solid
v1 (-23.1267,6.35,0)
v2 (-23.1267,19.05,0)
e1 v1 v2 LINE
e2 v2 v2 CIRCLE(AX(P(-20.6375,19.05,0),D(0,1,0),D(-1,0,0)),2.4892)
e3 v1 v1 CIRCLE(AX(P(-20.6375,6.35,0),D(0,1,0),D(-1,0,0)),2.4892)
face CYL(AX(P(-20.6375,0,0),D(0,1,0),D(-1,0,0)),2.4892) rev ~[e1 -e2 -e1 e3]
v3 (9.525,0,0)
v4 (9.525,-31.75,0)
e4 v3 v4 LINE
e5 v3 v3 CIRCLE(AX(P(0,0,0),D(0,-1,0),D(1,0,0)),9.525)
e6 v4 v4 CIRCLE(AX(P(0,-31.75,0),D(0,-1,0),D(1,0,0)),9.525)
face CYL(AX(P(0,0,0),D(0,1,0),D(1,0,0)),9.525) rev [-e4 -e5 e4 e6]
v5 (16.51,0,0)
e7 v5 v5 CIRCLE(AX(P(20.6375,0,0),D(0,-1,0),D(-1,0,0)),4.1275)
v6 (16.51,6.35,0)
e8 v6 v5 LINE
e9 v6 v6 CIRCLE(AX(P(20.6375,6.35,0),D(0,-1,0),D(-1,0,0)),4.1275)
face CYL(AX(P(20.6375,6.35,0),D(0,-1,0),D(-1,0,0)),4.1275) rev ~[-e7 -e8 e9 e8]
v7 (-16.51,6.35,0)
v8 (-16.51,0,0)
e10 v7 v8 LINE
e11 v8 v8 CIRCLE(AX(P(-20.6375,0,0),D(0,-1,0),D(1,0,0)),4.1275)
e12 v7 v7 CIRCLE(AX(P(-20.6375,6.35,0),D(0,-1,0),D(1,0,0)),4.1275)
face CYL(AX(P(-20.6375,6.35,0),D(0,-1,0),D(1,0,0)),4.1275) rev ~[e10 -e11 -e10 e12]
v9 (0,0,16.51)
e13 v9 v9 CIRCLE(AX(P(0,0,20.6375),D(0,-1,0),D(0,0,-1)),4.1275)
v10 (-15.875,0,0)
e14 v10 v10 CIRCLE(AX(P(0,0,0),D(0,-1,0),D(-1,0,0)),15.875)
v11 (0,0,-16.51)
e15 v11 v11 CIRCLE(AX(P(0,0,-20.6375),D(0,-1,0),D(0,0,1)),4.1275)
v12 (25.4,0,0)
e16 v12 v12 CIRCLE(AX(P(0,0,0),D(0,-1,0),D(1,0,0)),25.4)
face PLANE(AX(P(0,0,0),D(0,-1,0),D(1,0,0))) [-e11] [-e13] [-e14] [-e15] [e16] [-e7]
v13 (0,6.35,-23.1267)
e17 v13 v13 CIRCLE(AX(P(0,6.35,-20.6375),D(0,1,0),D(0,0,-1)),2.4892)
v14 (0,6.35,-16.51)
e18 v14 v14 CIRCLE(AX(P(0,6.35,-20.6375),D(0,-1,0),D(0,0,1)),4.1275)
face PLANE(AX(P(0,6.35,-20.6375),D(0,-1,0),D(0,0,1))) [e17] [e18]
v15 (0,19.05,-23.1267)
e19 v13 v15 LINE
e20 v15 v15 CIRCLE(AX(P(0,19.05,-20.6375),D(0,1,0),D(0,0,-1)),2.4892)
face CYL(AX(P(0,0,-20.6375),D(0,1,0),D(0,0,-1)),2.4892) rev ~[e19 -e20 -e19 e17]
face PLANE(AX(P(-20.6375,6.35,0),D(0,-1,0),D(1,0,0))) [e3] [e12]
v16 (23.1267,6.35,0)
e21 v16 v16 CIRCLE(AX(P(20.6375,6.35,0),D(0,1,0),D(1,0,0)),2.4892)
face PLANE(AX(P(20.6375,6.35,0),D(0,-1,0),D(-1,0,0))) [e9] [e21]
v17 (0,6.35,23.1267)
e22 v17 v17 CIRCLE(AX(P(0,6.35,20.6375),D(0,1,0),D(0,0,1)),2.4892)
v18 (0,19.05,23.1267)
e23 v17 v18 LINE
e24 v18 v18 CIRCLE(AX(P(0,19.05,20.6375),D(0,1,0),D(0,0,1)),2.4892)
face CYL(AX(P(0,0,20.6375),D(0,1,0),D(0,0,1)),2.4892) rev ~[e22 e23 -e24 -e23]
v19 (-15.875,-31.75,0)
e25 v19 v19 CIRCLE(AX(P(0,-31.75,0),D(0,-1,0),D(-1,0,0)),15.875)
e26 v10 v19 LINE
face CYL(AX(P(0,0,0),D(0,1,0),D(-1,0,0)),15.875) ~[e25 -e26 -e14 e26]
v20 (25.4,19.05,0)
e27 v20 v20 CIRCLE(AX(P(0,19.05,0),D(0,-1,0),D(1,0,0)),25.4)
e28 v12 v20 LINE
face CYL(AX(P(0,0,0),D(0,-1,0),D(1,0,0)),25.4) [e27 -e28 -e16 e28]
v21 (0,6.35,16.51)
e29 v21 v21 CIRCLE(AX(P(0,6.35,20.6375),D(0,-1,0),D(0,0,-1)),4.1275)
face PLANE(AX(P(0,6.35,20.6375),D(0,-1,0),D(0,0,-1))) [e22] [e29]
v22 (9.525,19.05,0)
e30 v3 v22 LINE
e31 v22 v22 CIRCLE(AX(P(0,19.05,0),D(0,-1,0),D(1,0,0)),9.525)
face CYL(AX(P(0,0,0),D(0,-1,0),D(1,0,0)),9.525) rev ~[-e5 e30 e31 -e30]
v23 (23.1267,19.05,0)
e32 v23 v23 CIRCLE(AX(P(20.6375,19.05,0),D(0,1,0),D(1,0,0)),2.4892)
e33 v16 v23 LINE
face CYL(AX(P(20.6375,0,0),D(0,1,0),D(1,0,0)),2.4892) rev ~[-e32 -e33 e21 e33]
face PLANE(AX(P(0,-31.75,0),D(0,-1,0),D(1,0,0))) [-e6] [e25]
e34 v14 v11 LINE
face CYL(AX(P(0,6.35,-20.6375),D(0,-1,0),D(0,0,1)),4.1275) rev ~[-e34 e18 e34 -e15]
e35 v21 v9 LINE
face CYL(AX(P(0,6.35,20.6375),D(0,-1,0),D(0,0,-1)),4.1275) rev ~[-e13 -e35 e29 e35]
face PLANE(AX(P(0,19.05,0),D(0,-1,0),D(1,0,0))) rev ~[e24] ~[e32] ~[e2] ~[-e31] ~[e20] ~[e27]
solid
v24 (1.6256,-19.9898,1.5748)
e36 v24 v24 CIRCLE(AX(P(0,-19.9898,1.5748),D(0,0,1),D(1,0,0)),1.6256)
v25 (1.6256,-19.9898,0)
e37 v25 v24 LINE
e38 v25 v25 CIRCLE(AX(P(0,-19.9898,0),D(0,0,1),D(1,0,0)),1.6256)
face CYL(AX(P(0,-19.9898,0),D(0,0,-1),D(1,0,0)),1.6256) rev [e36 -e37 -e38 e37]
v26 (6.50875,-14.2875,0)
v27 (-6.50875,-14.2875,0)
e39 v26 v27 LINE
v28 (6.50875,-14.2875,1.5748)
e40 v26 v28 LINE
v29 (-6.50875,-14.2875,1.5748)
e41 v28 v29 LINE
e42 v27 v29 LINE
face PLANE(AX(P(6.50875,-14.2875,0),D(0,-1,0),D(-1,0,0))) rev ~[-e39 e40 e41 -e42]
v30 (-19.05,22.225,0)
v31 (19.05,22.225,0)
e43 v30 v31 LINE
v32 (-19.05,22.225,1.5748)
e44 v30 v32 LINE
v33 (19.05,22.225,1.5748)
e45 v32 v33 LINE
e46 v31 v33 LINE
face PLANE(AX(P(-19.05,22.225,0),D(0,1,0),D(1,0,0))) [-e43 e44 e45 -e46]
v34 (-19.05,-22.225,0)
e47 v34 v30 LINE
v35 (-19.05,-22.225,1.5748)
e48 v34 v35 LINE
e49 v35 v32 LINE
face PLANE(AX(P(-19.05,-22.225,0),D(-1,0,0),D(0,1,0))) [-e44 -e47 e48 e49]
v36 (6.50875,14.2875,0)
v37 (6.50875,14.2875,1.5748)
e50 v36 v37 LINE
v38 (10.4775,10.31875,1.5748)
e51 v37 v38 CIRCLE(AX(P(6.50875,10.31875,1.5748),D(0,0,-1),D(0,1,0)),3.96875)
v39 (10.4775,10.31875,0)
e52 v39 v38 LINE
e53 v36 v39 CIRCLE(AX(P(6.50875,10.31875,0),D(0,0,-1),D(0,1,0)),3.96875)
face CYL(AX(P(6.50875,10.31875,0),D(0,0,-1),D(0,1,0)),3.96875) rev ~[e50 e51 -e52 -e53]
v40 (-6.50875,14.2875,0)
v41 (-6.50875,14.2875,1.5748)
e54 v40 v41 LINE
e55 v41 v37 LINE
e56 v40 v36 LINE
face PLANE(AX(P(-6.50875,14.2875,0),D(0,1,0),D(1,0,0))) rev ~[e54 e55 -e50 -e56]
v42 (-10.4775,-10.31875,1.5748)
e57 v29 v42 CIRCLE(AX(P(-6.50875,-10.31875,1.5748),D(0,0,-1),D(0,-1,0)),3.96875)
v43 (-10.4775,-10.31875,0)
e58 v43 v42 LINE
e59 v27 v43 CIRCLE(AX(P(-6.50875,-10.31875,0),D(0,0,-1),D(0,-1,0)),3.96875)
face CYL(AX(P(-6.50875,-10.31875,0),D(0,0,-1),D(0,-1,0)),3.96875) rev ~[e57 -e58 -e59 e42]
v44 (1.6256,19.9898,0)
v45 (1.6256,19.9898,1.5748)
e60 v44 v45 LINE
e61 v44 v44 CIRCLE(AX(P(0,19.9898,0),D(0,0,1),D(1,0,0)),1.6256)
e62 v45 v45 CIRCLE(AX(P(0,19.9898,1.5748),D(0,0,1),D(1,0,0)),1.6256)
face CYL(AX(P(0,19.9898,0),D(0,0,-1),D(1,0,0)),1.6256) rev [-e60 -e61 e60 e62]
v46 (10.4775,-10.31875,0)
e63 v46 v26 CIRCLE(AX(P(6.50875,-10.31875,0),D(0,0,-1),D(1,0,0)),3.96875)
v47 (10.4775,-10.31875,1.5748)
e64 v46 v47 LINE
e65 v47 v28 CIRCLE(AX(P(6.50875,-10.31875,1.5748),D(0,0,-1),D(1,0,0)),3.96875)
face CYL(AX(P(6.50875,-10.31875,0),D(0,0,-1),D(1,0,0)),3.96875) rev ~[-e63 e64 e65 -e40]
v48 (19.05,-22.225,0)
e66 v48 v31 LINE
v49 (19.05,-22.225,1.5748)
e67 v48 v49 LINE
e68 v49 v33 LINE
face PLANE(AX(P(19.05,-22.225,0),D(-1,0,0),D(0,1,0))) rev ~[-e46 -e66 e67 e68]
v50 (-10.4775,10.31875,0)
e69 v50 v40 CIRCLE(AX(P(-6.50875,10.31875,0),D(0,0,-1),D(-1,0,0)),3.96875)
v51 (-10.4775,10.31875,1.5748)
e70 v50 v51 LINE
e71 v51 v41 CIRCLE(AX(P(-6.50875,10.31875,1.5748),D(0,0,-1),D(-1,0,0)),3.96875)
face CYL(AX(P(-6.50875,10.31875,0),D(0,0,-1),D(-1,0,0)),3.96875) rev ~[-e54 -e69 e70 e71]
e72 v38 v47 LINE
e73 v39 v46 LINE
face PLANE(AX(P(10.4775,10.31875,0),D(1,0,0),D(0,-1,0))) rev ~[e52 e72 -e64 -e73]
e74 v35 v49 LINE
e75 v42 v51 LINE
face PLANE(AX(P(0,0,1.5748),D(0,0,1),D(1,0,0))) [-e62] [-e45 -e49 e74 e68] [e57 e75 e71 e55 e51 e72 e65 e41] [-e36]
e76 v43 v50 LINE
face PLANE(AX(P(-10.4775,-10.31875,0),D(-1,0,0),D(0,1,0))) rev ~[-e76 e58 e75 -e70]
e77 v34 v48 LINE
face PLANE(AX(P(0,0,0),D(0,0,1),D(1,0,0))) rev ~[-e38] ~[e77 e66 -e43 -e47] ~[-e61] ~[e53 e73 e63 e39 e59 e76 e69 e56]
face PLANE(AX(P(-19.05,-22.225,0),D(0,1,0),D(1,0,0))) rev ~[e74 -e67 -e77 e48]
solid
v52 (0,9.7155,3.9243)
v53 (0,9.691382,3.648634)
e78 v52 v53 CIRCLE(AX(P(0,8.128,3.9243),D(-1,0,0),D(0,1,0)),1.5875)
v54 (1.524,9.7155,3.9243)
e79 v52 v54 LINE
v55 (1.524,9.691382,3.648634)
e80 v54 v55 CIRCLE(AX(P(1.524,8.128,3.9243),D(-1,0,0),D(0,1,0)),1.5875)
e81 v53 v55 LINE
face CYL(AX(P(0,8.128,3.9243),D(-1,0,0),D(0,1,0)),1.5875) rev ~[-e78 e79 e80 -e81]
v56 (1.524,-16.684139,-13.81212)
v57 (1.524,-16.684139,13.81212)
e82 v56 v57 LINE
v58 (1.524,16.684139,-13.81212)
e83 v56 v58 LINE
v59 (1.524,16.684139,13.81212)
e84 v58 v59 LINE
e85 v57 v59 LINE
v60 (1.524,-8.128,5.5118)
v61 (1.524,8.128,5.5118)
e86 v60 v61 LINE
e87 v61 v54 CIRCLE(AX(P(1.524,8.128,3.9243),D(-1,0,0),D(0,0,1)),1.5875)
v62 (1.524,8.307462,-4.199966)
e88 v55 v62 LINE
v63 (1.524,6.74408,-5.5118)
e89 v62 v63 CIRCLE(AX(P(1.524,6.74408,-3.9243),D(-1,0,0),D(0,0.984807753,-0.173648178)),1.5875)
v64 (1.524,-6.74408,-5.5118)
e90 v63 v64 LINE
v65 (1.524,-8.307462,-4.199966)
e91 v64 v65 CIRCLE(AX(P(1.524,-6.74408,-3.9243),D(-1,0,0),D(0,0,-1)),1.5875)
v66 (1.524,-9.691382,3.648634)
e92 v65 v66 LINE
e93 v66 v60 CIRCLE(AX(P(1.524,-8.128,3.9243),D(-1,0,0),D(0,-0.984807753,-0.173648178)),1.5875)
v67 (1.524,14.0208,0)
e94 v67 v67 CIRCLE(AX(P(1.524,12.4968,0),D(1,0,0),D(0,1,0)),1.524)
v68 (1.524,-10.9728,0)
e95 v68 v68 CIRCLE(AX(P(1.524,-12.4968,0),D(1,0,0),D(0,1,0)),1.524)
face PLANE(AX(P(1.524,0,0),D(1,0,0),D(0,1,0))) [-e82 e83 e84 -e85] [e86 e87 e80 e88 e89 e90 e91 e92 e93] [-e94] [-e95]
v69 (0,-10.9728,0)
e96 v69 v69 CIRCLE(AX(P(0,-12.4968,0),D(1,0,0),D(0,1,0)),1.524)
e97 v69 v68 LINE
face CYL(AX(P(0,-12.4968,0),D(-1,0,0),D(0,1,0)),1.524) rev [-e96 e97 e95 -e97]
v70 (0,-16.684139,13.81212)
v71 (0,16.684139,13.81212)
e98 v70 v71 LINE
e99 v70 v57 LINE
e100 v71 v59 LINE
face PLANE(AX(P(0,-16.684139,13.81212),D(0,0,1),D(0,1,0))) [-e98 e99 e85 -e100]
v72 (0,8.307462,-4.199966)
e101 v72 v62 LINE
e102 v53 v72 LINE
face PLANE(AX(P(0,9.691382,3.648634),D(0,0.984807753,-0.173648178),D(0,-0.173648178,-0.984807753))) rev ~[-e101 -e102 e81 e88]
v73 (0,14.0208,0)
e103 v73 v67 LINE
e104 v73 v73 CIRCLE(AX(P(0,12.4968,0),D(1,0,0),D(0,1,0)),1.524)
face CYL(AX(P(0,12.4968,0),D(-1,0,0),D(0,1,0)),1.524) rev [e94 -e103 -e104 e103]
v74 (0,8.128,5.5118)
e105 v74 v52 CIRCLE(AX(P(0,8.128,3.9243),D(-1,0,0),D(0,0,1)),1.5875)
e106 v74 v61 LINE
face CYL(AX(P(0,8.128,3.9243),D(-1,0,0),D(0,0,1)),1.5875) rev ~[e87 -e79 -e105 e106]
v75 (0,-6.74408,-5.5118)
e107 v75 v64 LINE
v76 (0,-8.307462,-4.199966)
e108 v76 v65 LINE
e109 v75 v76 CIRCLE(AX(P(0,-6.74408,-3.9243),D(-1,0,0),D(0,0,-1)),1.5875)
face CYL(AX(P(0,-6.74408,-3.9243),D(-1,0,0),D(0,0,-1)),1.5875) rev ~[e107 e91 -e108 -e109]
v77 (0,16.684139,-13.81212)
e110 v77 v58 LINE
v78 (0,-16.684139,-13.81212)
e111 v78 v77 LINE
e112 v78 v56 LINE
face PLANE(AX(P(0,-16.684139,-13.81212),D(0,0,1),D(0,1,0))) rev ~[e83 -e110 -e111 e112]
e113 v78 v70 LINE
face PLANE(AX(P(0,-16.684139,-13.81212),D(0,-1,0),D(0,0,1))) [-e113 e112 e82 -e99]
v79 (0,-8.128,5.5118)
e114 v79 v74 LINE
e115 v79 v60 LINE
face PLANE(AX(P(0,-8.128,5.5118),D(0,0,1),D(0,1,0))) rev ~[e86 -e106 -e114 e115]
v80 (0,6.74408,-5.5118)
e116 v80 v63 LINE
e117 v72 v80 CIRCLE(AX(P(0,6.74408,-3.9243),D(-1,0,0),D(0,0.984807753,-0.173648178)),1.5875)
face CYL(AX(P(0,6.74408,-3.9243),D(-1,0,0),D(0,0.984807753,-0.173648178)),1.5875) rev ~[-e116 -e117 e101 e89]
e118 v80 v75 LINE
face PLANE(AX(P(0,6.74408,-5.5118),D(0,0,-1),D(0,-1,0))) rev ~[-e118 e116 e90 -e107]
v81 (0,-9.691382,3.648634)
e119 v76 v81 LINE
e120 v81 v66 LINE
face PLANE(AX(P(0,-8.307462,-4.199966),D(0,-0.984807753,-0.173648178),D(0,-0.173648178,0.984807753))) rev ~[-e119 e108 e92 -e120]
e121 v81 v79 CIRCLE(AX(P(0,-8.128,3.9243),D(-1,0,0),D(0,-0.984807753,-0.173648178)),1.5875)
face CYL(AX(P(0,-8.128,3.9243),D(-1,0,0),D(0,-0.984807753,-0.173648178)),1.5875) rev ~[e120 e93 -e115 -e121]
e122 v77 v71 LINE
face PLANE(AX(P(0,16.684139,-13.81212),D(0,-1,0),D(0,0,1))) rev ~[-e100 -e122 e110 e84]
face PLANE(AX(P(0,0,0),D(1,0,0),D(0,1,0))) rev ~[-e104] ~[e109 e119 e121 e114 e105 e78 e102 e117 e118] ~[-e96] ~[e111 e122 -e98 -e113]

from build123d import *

# Parameters (mm, degrees)
F0_R            = 9.525
F1_DEPTH        = 31.75
F2_DEPTH        = 19.05
F3_D            = 4.9784
F3_CBORE_D      = 8.255
F3_CBORE_DEPTH  = 6.35
F3_COPIES_COUNT = 4
F4_W            = 33.3682782948
F4_H            = 27.6242401451
F4_R            = 1.524
F5_DEPTH        = 1.524
F6_W            = 38.1
F6_H            = 44.45
F6_R            = 1.6256
F7_DEPTH        = 1.5748


# Not quite as in the source:
# - a pattern or mirror of a feature is missing from the dataset's text; its kind, count and spacing are read off the source's solid


with BuildPart() as f1:
    # F0 (on Front) → F1 (new body)
    with BuildSketch(Plane.XZ):
        with BuildLine():
            ThreePointArc((15.875, 0), (0, 15.875), (-15.875, 0))
            ThreePointArc((-15.875, 0), (0, -15.875), (15.875, 0))
        make_face()
        Circle(F0_R, mode=Mode.SUBTRACT)
    extrude(amount=F1_DEPTH)

    # F0 (on Front) → F2 (join)
    with BuildSketch(Plane.XZ):
        with BuildLine():
            ThreePointArc((-25.4, 0), (0, -25.4), (25.4, 0))
            ThreePointArc((25.4, 0), (0, 25.4), (-25.4, 0))
        make_face()
        with BuildLine():
            ThreePointArc((15.875, 0), (0, -15.875), (-15.875, 0))
            ThreePointArc((-15.875, 0), (0, 15.875), (15.875, 0))
        make_face(mode=Mode.SUBTRACT)
        with BuildLine():
            ThreePointArc((15.875, 0), (0, 15.875), (-15.875, 0))
            ThreePointArc((-15.875, 0), (0, -15.875), (15.875, 0))
        make_face()
        Circle(F0_R, mode=Mode.SUBTRACT)
    extrude(amount=-F2_DEPTH)

    # F3 (through all)
    with Locations(Plane.XZ):
        with Locations((-20.6375, 0)):
            f3 = CounterBoreHole(F3_D / 2, F3_CBORE_D / 2, F3_CBORE_DEPTH)

    # F3_copies: F3 ×4 about axis
    f3_copies_axis = Axis((0, 0, 0), (0, 1, 0))
    for i in range(1, F3_COPIES_COUNT):
        add(f3.rotate(f3_copies_axis, i * 360 / F3_COPIES_COUNT), mode=Mode.SUBTRACT)


with BuildPart() as f5:
    # F4 (on Right) → F5 (new body)
    with BuildSketch(Plane.YZ):
        Rectangle(F4_W, F4_H)
        with Locations((-12.4968, 0)):
            Circle(F4_R, mode=Mode.SUBTRACT)
        with BuildLine():
            ThreePointArc((-9.6913823079, 3.648633518), (-9.3440955535, 4.9447253304), (-8.128, 5.5118))
            Line((-8.128, 5.5118), (8.128, 5.5118))
            ThreePointArc((8.128, 5.5118), (9.2505320151, 5.0468320151), (9.7155, 3.9243))
            ThreePointArc((9.7155, 3.9243), (9.7094590832, 3.7859402584), (9.6913823079, 3.648633518))
            Line((9.6913823079, 3.648633518), (8.3074623671, -4.199966482))
            ThreePointArc((8.3074623671, -4.199966482), (7.7645053896, -5.1403955535), (6.7440800592, -5.5118))
            Line((6.7440800592, -5.5118), (-6.7440800592, -5.5118))
            ThreePointArc((-6.7440800592, -5.5118), (-7.7645053896, -5.1403955535), (-8.3074623671, -4.199966482))
            Line((-8.3074623671, -4.199966482), (-9.6913823079, 3.648633518))
        make_face(mode=Mode.SUBTRACT)
        with Locations((12.4968, 0)):
            Circle(F4_R, mode=Mode.SUBTRACT)
    extrude(amount=F5_DEPTH)


with BuildPart() as f7:
    # F6 (on Top) → F7 (new body)
    with BuildSketch(Plane.XY):
        Rectangle(F6_W, F6_H)
        with Locations((0, -19.9898)):
            Circle(F6_R, mode=Mode.SUBTRACT)
        with BuildLine():
            Line((-6.50875, 14.2875), (6.50875, 14.2875))
            ThreePointArc((6.50875, 14.2875), (9.3150800378, 13.1250800378), (10.4775, 10.31875))
            Line((10.4775, 10.31875), (10.4775, -10.31875))
            ThreePointArc((10.4775, -10.31875), (9.3150800378, -13.1250800378), (6.50875, -14.2875))
            Line((6.50875, -14.2875), (-6.50875, -14.2875))
            ThreePointArc((-6.50875, -14.2875), (-9.3150800378, -13.1250800378), (-10.4775, -10.31875))
            Line((-10.4775, -10.31875), (-10.4775, 10.31875))
            ThreePointArc((-10.4775, 10.31875), (-9.3150800378, 13.1250800378), (-6.50875, 14.2875))
        make_face(mode=Mode.SUBTRACT)
        with Locations((0, 19.9898)):
            Circle(F6_R, mode=Mode.SUBTRACT)
    extrude(amount=F7_DEPTH)


solid = Compound([f1.part, f5.part, f7.part])
